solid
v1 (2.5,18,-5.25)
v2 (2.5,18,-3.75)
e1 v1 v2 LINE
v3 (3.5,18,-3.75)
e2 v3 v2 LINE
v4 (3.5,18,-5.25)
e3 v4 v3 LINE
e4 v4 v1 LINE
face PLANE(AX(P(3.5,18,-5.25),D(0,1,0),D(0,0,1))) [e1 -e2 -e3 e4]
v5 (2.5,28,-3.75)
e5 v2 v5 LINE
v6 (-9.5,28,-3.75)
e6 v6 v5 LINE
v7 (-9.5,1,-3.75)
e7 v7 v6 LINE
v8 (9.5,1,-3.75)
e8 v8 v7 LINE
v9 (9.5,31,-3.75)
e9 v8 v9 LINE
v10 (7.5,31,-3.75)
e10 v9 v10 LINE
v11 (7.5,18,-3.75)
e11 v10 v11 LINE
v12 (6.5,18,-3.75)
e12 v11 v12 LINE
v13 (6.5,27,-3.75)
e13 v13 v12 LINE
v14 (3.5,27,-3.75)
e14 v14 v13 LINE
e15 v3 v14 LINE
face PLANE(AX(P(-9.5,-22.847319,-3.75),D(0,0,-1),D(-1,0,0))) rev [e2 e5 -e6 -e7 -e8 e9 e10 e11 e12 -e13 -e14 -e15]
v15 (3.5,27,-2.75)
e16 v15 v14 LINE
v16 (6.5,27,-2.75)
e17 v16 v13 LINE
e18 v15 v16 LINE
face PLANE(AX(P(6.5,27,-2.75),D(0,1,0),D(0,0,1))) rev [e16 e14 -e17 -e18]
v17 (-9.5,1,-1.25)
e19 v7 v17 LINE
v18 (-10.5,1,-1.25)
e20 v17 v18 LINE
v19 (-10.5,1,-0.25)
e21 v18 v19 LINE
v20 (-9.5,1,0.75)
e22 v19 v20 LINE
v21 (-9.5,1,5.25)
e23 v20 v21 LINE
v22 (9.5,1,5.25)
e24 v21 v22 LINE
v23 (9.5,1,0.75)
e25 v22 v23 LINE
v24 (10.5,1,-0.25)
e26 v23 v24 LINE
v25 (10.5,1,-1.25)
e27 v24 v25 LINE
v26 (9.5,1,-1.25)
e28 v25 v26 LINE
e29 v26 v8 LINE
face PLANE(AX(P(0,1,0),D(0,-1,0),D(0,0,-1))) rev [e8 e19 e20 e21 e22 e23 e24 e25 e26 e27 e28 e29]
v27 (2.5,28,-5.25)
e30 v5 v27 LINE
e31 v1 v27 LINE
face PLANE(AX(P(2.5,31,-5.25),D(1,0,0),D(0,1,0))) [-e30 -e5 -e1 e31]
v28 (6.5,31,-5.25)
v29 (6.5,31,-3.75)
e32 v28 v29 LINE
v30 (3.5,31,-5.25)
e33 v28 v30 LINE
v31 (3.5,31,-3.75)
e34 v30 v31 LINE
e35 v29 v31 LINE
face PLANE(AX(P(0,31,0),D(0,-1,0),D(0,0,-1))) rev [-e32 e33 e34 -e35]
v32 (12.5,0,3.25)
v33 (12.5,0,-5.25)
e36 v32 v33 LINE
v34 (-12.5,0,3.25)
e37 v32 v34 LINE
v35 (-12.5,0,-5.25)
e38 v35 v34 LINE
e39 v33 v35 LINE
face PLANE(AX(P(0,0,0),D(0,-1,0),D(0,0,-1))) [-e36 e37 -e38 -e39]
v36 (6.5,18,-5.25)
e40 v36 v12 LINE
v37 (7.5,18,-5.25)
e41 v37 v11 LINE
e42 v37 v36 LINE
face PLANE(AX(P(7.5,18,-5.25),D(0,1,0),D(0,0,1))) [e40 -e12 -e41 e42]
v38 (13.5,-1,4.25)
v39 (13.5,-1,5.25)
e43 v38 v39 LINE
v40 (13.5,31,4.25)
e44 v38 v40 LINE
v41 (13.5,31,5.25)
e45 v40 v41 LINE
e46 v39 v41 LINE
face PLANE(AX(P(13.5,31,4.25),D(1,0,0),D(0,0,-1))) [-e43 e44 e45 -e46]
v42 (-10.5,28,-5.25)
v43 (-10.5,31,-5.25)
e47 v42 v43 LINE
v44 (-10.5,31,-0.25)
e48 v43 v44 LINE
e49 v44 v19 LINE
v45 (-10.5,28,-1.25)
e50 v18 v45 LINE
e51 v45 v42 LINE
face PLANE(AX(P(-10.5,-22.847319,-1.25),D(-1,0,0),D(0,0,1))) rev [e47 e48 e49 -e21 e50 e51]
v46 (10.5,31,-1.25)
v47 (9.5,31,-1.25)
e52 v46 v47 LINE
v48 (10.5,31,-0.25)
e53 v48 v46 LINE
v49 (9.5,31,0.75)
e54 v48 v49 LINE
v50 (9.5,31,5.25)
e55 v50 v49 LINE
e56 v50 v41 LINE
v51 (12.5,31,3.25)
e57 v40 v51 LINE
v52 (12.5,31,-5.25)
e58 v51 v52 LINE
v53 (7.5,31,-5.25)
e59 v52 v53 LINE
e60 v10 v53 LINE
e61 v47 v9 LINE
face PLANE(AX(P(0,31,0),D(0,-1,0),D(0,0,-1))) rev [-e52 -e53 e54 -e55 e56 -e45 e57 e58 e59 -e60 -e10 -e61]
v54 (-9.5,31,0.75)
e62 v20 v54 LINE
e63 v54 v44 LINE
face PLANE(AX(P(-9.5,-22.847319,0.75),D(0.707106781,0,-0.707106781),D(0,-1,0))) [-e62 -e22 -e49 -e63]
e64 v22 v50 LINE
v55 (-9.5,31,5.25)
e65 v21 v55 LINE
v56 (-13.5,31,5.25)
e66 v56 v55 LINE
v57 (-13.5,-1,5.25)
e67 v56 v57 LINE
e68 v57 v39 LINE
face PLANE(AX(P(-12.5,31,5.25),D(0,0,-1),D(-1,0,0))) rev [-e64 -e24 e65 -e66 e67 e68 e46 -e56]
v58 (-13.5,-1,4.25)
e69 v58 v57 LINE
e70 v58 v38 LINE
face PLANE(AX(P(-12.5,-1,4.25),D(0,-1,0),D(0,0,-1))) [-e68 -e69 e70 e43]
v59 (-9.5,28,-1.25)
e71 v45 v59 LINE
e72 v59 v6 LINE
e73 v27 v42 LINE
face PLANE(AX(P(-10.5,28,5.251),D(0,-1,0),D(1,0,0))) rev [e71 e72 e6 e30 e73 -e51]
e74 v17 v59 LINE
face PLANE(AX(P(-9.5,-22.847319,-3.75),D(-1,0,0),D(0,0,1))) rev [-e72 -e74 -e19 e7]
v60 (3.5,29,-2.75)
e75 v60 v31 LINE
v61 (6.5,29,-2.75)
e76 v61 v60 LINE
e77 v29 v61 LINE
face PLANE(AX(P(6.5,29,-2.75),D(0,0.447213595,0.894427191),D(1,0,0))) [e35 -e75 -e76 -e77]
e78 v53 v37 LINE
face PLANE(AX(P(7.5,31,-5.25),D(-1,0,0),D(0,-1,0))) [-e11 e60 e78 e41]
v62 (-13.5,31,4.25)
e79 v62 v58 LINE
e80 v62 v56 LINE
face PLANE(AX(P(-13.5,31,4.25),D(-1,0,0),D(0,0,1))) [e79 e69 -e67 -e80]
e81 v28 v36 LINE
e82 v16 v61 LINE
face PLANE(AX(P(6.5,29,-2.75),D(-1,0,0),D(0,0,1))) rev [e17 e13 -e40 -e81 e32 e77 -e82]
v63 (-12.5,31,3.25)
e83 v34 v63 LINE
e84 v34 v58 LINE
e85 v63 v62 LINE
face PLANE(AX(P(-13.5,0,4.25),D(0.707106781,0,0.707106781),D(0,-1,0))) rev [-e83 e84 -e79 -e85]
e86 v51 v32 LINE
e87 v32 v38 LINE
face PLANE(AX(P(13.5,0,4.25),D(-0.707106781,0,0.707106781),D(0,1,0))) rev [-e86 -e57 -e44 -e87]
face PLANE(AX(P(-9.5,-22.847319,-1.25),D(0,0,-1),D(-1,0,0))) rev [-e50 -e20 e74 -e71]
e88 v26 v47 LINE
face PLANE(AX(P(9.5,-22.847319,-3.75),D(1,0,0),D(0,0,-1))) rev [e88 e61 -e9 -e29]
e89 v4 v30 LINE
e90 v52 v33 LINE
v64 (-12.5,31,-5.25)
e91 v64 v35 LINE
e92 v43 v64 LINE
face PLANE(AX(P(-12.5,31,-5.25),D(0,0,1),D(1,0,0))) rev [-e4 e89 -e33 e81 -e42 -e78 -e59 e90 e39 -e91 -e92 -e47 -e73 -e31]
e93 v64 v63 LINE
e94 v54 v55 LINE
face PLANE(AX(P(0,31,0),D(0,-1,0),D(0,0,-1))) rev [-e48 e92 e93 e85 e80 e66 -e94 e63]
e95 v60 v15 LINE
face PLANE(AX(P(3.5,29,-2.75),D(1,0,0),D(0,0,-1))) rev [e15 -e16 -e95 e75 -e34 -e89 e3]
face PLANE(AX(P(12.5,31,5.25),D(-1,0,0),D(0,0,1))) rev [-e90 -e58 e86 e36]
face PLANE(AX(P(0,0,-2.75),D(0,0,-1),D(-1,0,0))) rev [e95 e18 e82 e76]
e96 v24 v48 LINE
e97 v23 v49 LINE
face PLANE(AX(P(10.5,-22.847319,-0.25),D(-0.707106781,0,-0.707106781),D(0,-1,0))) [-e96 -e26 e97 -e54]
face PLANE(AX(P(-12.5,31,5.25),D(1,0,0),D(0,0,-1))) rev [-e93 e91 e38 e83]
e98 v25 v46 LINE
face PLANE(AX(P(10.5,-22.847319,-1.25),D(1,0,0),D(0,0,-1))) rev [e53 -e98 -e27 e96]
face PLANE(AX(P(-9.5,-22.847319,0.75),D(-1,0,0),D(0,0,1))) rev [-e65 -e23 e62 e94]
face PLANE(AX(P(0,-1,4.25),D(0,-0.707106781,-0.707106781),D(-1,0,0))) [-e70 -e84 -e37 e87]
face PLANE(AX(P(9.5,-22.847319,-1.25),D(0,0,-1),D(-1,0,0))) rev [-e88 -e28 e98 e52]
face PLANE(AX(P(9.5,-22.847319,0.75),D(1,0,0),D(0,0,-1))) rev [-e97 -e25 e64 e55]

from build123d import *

# Parameters (mm, degrees)
SKETCH1_W               = 25
SKETCH1_H               = 10.5
BOSS_EXTRUDE1_DEPTH     = 31
CUT_EXTRUDE1_DEPTH      = 30
SKETCH8_W               = 3
SKETCH8_H               = 2
BOSS_EXTRUDE4_DEPTH     = 1
CHAMFER1_SIZE2          = 1
CHAMFER1_SIZE           = 2
CUT_EXTRUDE_THIN1_DEPTH = 35.615747861
CUT_EXTRUDE5_REACH      = 37.036
SKETCH10_W              = 13
SKETCH10_H              = 3
EXTRUDE_THIN1_DEPTH     = 1
CHAMFER2_SIZE           = 1
CHAMFER3_SIZE           = 1


with BuildPart() as part:
    # Sketch1 → Boss-Extrude1 (new body)
    with BuildSketch(Plane(origin=(0, 0, 0), x_dir=(1, 0, 0), z_dir=(0, 1, 0))):
        Rectangle(SKETCH1_W, SKETCH1_H)
    extrude(amount=BOSS_EXTRUDE1_DEPTH)

    # Sketch2 → Cut-Extrude1 (cut)
    with BuildSketch(Plane(origin=(0, 31, 0), x_dir=(1, 0, 0), z_dir=(0, 1, 0))):
        Polygon((-9.5, 3.75), (9.5, 3.75), (9.5, 1.25), (10.5, 1.25), (10.5, -0.75), (9.5, -0.75), (9.5, -5.25), (-9.5, -5.25), (-9.5, -0.75), (-10.5, -0.75), (-10.5, 1.25), (-9.5, 1.25), align=None)
    extrude(amount=-CUT_EXTRUDE1_DEPTH, mode=Mode.SUBTRACT)

    # Sketch8 → Boss-Extrude4 (add)
    with BuildSketch(Plane.XY.offset(-3.75)):
        with Locations((5, 28)):
            Rectangle(SKETCH8_W, SKETCH8_H)
    extrude(amount=BOSS_EXTRUDE4_DEPTH)

    # Chamfer1
    chamfer1_edges = [part.edges().sort_by_distance(p)[0] for p in [
        (5, 29, -3.75),
    ]]
    chamfer1_side = [part.faces().sort_by_distance(p)[0] for p in [
        (5, 29.02, -3.75),
    ]]
    chamfer(chamfer1_edges, length=CHAMFER1_SIZE - 0.0001, length2=CHAMFER1_SIZE2 - 0.0001, reference=chamfer1_side[0])  # a hair under: the kernel refuses the full size

    # Sketch9 → Cut-Extrude-Thin1 (cut, through all)
    with BuildSketch(Plane.XY.offset(-3.75)):
        Polygon((6.5, 18), (6.5, 31), (3.5, 31), (3.5, 18), (2.5, 18), (2.5, 32), (7.5, 32), (7.5, 18), align=None)
    extrude(amount=-CUT_EXTRUDE_THIN1_DEPTH, mode=Mode.SUBTRACT)

    # Sketch10 → Cut-Extrude5 (cut, up to next)
    with BuildSketch(Plane(origin=(0, 0, -5.25), x_dir=(-1, 0, 0), z_dir=(0, 0, -1)), mode=Mode.PRIVATE) as cut_extrude5_sk1:
        with Locations((4, 29.5)):
            Rectangle(SKETCH10_W, SKETCH10_H)
    cut_extrude5_tool1 = extrude(cut_extrude5_sk1.sketch, amount=-CUT_EXTRUDE5_REACH, mode=Mode.PRIVATE) & part.part
    add(cut_extrude5_tool1.solids().sort_by_distance((-4, 29.5, -5.25))[0], mode=Mode.SUBTRACT)

    # Sketch11 → Extrude-Thin1 (add)
    with BuildSketch(Plane.XY.offset(5.25)):
        Polygon((12.5, 31), (12.5, 0), (-12.5, 0), (-12.5, 31), (-13.5, 31), (-13.5, -1), (13.5, -1), (13.5, 31), align=None)
    extrude(amount=-EXTRUDE_THIN1_DEPTH)

    # Chamfer2
    chamfer2_edges = [part.edges().sort_by_distance(p)[0] for p in [
        (-12.5, 15.5, 4.25),
        (0, 0, 4.25),
        (12.5, 15.5, 4.25),
    ]]
    chamfer(chamfer2_edges, length=CHAMFER2_SIZE - 0.0001)  # a hair under: the kernel refuses the full size

    # Chamfer3
    chamfer3_edges = [part.edges().sort_by_distance(p)[0] for p in [
        (-10.5, 16, 0.75),
        (10.5, 16, 0.75),
    ]]
    chamfer(chamfer3_edges, length=CHAMFER3_SIZE - 0.0001)  # a hair under: the kernel refuses the full size


solid = part.part
